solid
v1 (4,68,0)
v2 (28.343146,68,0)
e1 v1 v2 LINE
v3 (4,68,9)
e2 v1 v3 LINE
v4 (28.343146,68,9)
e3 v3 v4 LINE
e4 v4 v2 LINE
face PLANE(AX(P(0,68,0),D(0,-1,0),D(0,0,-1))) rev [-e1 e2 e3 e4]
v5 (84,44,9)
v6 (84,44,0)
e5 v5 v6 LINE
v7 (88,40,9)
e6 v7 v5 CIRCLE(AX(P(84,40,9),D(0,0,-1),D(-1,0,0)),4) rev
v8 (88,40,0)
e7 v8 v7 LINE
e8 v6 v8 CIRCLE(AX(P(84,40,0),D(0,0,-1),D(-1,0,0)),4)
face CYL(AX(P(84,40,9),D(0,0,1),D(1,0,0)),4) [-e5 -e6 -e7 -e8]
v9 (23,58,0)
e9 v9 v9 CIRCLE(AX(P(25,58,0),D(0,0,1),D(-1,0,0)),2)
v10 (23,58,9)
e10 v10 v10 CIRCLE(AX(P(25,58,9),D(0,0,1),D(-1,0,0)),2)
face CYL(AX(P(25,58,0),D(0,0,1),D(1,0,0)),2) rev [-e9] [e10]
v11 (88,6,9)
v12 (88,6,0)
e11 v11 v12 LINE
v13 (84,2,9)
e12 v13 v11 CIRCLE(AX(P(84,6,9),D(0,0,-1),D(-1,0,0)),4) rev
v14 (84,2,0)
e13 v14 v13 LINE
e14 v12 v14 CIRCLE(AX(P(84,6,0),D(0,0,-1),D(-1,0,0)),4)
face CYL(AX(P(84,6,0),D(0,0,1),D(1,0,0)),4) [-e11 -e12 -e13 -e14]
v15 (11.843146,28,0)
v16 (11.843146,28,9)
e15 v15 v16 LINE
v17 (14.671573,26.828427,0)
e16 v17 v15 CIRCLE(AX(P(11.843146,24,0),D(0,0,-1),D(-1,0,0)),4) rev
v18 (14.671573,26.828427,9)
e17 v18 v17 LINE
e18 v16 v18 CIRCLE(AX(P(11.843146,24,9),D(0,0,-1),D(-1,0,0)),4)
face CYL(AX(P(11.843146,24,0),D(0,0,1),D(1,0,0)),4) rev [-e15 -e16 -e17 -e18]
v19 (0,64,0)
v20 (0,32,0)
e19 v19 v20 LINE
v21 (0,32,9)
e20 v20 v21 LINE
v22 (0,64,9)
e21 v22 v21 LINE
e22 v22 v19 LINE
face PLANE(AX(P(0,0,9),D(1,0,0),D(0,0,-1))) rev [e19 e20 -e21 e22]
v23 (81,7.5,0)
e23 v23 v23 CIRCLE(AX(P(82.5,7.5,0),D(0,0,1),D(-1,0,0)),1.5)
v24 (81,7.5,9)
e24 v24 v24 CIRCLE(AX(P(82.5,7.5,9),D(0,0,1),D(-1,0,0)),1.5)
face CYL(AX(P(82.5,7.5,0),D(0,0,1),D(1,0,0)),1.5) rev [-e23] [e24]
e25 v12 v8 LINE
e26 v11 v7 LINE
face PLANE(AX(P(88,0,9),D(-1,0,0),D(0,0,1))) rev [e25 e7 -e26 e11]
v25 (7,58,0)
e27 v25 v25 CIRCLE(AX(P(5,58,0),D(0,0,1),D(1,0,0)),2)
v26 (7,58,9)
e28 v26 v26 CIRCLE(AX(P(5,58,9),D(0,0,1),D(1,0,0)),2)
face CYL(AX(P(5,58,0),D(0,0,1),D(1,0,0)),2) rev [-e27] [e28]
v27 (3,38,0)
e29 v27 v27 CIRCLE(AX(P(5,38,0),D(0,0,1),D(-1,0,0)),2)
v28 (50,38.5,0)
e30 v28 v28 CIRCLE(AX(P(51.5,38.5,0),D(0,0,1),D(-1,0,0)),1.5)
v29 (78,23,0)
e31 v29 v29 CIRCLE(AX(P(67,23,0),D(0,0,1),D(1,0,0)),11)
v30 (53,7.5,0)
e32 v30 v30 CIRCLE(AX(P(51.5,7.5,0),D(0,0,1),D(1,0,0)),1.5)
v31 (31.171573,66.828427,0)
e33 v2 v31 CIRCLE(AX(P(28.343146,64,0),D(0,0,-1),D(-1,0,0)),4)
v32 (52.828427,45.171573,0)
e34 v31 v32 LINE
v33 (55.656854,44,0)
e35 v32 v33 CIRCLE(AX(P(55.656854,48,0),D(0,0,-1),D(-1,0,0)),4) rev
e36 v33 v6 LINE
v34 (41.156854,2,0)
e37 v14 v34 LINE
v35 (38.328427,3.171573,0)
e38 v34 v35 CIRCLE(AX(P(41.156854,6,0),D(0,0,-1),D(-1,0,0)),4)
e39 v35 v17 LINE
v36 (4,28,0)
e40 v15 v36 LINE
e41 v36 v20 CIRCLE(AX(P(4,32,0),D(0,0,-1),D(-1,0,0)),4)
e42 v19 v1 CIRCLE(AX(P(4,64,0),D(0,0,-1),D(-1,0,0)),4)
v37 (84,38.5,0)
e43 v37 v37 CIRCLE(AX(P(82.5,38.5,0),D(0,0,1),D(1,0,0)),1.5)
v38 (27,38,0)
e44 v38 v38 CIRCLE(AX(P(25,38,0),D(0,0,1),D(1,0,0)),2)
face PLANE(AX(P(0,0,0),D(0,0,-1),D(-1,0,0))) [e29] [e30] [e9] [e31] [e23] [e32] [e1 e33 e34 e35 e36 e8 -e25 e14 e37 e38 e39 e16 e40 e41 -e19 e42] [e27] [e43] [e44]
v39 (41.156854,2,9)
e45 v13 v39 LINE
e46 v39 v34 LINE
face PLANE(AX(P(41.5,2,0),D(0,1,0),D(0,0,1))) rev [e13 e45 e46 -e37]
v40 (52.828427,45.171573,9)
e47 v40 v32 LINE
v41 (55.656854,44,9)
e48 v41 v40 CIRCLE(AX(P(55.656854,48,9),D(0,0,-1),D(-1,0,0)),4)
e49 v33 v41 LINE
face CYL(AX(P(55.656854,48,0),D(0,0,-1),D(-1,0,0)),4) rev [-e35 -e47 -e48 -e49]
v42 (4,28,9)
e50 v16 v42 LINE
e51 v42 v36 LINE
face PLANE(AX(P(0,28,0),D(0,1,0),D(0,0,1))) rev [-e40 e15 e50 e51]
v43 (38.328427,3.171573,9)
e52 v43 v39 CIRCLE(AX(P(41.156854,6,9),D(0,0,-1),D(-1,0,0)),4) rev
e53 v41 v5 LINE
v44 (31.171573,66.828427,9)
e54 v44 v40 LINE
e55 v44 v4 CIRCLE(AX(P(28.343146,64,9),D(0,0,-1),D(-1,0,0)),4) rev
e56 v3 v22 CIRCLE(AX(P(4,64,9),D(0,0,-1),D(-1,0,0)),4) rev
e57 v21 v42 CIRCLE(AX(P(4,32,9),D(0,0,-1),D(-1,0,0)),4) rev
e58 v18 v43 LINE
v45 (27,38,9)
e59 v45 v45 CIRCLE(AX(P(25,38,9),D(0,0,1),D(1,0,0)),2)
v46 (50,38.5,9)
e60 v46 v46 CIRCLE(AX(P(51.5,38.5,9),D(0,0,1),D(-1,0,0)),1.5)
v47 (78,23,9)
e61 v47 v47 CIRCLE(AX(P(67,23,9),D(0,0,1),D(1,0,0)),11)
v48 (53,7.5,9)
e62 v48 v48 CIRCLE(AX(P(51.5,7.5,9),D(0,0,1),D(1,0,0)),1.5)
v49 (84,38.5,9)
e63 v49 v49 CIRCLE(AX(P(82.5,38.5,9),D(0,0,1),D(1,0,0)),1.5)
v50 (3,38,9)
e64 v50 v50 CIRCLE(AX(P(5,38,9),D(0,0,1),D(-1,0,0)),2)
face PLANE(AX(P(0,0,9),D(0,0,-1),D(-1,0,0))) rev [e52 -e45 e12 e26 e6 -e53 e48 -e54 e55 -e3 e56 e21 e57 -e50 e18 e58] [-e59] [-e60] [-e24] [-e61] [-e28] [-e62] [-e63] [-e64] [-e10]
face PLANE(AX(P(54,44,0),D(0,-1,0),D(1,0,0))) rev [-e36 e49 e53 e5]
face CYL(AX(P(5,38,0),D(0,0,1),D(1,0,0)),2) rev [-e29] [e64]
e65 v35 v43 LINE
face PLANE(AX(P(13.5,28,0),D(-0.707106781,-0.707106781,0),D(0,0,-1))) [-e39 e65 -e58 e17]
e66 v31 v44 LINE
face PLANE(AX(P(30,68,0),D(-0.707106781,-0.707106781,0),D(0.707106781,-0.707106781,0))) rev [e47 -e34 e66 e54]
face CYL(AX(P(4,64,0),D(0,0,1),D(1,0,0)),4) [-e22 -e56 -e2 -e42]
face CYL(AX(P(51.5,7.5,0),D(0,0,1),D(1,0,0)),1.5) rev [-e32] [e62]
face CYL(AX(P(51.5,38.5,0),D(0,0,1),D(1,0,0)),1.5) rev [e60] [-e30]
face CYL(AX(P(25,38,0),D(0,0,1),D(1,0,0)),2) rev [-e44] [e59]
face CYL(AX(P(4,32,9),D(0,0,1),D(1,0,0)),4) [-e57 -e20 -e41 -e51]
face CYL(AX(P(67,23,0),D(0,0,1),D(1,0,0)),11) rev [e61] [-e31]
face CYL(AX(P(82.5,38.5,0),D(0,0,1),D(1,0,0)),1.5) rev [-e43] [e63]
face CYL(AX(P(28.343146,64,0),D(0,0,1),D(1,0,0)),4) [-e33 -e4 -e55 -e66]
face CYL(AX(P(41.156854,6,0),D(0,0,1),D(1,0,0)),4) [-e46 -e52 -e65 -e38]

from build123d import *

# Parameters (mm, degrees)
ESQUISSE1_W             = 88
ESQUISSE1_H             = 96
BOSS_EXTRU_1_DEPTH      = 9
ESQUISSE2_R             = 2
ENL_V_MAT_EXTRU_1_DEPTH = 131.541181242
ESQUISSE3_R             = 1.5
ESQUISSE3_R_2           = 11
ENL_V_MAT_EXTRU_2_DEPTH = 131.541181242
ESQUISSE4_W             = 88
ESQUISSE4_H             = 28
ENL_V_MAT_EXTRU_3_DEPTH = 131.541181242
ENL_V_MAT_EXTRU_4_DEPTH = 9
ESQUISSE6_W             = 41.5
ESQUISSE6_H             = 28
ENL_V_MAT_EXTRU_5_DEPTH = 112.575086825
ESQUISSE7_W             = 46.5
ESQUISSE7_H             = 2
ENL_V_MAT_EXTRU_6_DEPTH = 112.575086825
CHANFREIN1_SIZE         = 28
CONG_1_R                = 4


with BuildPart() as part:
    # Esquisse1 → Boss.-Extru.1 (new body)
    with BuildSketch(Plane.XY):
        with Locations((44, 48)):
            Rectangle(ESQUISSE1_W, ESQUISSE1_H)
    extrude(amount=BOSS_EXTRU_1_DEPTH)

    # Esquisse2 → Enlèv. mat.-Extru.1 (cut, through all)
    with BuildSketch(Plane.XY.offset(9)):
        with Locations((5, 58)):
            Circle(ESQUISSE2_R)
        with Locations(Location((5, 38, 0), (0, 0, 180))):
            Circle(ESQUISSE2_R)
        with Locations((25, 38)):
            Circle(ESQUISSE2_R)
        with Locations(Location((25, 58, 0), (0, 0, 180))):
            Circle(ESQUISSE2_R)
    extrude(amount=-ENL_V_MAT_EXTRU_1_DEPTH, mode=Mode.SUBTRACT)

    # Esquisse3 → Enlèv. mat.-Extru.2 (cut, through all)
    with BuildSketch(Plane.XY.offset(9)):
        with Locations((82.5, 38.5)):
            Circle(ESQUISSE3_R)
        with Locations(Location((82.5, 7.5, 0), (0, 0, 180))):
            Circle(ESQUISSE3_R)
        with Locations((51.5, 7.5)):
            Circle(ESQUISSE3_R)
        with Locations(Location((51.5, 38.5, 0), (0, 0, 180))):
            Circle(ESQUISSE3_R)
        with Locations((67, 23)):
            Circle(ESQUISSE3_R_2)
    extrude(amount=-ENL_V_MAT_EXTRU_2_DEPTH, mode=Mode.SUBTRACT)

    # Esquisse4 → Enlèv. mat.-Extru.3 (cut, through all)
    with BuildSketch(Plane.XY.offset(9)):
        with Locations((44, 82)):
            Rectangle(ESQUISSE4_W, ESQUISSE4_H)
    extrude(amount=-ENL_V_MAT_EXTRU_3_DEPTH, mode=Mode.SUBTRACT)

    # Esquisse5 → Enlèv. mat.-Extru.4 (cut)
    with BuildSketch(Plane.XY.offset(9)):
        Polygon((30, 68), (54, 44), (88, 44), (88, 68), align=None)
    extrude(amount=-ENL_V_MAT_EXTRU_4_DEPTH, mode=Mode.SUBTRACT)

    # Esquisse6 → Enlèv. mat.-Extru.5 (cut, through all)
    with BuildSketch(Plane.XY.offset(9)):
        with Locations((20.75, 14)):
            Rectangle(ESQUISSE6_W, ESQUISSE6_H)
    extrude(amount=-ENL_V_MAT_EXTRU_5_DEPTH, mode=Mode.SUBTRACT)

    # Esquisse7 → Enlèv. mat.-Extru.6 (cut, through all)
    with BuildSketch(Plane.XY.offset(9)):
        with Locations((64.75, 1)):
            Rectangle(ESQUISSE7_W, ESQUISSE7_H)
    extrude(amount=-ENL_V_MAT_EXTRU_6_DEPTH, mode=Mode.SUBTRACT)

    # Chanfrein1
    # the kernel refuses this chamfer: 28 mm, written as the material it adds along each edge
    with BuildSketch(Plane(origin=(41.5, 28, 9), x_dir=(0.027495876610586358, -0.9996219169112968, 0), z_dir=(0, 0, -1))) as chanfrein1_piece_1_section:
        Polygon((CHANFREIN1_SIZE * 0.999621916911, CHANFREIN1_SIZE * 0.0274958766106), (-CHANFREIN1_SIZE * 0.0274958766106, CHANFREIN1_SIZE * 0.999621916911), (0, 0), align=None)
    chanfrein1_piece_1 = extrude(amount=9, mode=Mode.PRIVATE)
    chanfrein1_piece_1 = split(chanfrein1_piece_1, bisect_by=Plane(origin=(32.152400719, 2, 4.5), z_dir=(0, 1, 0)), keep=Keep.TOP, mode=Mode.PRIVATE)
    add(chanfrein1_piece_1)

    # Congé1
    cong_1_edges = [part.edges().sort_by_distance(p)[0] for p in [
        (88, 2, 4.5),
        (13.5, 28, 4.5),
        (39.5, 2, 4.5),
        (0, 68, 4.5),
        (30, 68, 4.5),
        (88, 44, 4.5),
        (54, 44, 4.5),
        (0, 28, 4.5),
    ]]
    fillet(cong_1_edges, radius=CONG_1_R)


solid = part.part
